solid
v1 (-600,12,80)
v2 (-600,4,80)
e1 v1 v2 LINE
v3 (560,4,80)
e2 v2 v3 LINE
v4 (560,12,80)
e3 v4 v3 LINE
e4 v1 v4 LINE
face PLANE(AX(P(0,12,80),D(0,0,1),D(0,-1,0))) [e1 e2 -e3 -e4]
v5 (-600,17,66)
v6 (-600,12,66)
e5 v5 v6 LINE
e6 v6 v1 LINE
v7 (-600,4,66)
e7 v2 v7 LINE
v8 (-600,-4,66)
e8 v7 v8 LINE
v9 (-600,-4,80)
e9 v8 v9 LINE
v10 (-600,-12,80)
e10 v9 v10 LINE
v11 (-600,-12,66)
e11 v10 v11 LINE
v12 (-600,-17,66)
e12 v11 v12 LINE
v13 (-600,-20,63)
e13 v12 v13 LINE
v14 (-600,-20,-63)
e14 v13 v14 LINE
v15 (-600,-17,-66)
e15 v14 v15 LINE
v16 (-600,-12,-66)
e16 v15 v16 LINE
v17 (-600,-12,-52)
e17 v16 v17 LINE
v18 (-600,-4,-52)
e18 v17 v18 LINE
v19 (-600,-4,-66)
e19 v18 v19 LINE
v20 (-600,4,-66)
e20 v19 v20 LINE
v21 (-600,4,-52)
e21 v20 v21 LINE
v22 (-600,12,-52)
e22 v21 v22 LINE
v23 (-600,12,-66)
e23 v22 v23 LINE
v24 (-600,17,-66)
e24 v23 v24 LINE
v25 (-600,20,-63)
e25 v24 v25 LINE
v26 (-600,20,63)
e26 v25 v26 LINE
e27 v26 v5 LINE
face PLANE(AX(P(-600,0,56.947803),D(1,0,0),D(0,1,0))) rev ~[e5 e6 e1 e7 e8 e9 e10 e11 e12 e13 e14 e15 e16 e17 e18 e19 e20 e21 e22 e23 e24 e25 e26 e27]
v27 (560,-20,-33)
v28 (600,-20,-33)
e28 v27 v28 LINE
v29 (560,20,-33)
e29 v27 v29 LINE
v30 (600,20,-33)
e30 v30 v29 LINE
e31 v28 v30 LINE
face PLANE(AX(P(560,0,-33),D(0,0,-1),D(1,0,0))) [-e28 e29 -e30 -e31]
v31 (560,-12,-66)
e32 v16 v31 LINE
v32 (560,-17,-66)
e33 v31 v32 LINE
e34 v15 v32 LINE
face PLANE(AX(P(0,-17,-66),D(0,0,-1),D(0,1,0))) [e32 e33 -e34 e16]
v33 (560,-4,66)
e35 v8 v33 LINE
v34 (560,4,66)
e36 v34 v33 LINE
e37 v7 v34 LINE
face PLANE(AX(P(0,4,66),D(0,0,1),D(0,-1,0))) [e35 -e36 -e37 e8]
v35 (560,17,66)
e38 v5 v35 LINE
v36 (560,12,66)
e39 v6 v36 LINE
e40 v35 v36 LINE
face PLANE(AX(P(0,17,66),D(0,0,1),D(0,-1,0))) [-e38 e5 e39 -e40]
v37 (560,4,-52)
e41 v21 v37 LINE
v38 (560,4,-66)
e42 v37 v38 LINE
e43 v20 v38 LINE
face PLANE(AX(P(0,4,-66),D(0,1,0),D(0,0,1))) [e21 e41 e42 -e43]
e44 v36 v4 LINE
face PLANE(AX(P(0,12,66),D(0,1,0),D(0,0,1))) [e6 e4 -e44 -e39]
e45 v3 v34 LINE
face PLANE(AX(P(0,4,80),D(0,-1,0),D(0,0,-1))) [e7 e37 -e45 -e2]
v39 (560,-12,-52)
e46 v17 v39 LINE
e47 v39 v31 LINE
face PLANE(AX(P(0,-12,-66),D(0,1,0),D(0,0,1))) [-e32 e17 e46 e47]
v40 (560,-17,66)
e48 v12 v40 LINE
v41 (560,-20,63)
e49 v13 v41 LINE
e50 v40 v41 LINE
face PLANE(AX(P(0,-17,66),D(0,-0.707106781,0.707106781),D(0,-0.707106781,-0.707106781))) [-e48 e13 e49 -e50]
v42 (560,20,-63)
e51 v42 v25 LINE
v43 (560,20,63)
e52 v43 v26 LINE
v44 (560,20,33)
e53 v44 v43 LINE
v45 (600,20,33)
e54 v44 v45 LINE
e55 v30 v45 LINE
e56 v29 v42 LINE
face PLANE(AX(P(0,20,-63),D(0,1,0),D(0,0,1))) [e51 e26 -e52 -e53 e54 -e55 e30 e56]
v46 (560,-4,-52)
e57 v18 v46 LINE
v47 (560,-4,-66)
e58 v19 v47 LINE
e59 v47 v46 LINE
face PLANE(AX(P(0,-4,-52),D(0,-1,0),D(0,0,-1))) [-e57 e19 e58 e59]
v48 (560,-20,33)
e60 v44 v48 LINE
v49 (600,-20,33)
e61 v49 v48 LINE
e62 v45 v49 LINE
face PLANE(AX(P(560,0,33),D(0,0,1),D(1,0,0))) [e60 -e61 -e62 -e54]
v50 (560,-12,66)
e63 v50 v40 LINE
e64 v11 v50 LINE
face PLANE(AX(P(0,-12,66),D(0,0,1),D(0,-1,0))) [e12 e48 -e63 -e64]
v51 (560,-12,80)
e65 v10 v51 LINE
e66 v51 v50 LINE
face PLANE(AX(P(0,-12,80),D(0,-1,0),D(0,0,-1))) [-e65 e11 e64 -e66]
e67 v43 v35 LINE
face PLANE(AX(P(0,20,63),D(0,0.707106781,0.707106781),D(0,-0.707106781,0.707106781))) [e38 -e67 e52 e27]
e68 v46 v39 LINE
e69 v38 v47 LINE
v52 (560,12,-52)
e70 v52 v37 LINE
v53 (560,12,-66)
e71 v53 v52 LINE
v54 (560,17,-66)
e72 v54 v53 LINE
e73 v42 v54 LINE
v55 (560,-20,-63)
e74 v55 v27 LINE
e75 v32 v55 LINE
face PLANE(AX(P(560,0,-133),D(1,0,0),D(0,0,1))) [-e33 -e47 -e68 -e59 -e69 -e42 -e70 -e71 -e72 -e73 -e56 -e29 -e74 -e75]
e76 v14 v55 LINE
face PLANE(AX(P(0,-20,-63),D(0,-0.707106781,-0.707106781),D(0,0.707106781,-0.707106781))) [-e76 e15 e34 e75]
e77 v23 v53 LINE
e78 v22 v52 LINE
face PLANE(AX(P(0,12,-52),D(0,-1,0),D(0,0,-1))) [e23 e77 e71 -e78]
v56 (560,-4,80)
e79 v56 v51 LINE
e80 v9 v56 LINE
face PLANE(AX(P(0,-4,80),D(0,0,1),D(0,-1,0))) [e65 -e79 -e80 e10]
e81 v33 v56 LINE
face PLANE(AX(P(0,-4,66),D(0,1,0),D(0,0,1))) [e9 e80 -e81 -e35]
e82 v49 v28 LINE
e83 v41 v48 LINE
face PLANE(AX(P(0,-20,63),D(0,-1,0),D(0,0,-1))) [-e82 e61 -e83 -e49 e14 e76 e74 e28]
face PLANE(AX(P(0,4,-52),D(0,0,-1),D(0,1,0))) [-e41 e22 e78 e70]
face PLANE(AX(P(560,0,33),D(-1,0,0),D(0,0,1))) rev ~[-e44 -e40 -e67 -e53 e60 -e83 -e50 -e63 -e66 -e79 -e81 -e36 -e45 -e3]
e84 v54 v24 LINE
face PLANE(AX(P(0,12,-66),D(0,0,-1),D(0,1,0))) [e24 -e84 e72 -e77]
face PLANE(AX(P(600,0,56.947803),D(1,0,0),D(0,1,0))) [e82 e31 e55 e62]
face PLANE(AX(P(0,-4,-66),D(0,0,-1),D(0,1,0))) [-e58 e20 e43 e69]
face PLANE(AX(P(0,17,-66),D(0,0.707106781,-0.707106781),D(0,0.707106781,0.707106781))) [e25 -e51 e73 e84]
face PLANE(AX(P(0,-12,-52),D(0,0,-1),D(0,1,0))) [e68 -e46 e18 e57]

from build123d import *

# Parameters (mm, degrees)
F1_W     = 40
F1_H     = 33
F3_DEPTH = 600
F2_W     = 80
F2_H     = 100
F4_DEPTH = 25


with BuildPart() as f3:
    # F1 (on Right) → F3 (new body, symmetric)
    with BuildSketch(Plane.YZ):
        Polygon((20, 33), (20, 63), (17, 66), (12, 66), (12, 80), (4, 80), (4, 66), (-4, 66), (-4, 80), (-12, 80), (-12, 66), (-17, 66), (-20, 63), (-20, 33), align=None)
        with Locations((0, 16.5)):
            Rectangle(F1_W, F1_H)
        with Locations((0, -16.5)):
            Rectangle(F1_W, F1_H)
        Polygon((20, -63), (20, -33), (-20, -33), (-20, -63), (-17, -66), (-12, -66), (-12, -52), (-4, -52), (-4, -66), (4, -66), (4, -52), (12, -52), (12, -66), (17, -66), align=None)
    extrude(amount=F3_DEPTH, both=True)

    # F2 (on Front) → F4 (cut, symmetric)
    with BuildSketch(Plane.XZ):
        with Locations((600, 83)):
            Rectangle(F2_W, F2_H)
        with Locations((600, -83)):
            Rectangle(F2_W, F2_H)
    extrude(amount=F4_DEPTH, both=True, mode=Mode.SUBTRACT)


solid = f3.part
